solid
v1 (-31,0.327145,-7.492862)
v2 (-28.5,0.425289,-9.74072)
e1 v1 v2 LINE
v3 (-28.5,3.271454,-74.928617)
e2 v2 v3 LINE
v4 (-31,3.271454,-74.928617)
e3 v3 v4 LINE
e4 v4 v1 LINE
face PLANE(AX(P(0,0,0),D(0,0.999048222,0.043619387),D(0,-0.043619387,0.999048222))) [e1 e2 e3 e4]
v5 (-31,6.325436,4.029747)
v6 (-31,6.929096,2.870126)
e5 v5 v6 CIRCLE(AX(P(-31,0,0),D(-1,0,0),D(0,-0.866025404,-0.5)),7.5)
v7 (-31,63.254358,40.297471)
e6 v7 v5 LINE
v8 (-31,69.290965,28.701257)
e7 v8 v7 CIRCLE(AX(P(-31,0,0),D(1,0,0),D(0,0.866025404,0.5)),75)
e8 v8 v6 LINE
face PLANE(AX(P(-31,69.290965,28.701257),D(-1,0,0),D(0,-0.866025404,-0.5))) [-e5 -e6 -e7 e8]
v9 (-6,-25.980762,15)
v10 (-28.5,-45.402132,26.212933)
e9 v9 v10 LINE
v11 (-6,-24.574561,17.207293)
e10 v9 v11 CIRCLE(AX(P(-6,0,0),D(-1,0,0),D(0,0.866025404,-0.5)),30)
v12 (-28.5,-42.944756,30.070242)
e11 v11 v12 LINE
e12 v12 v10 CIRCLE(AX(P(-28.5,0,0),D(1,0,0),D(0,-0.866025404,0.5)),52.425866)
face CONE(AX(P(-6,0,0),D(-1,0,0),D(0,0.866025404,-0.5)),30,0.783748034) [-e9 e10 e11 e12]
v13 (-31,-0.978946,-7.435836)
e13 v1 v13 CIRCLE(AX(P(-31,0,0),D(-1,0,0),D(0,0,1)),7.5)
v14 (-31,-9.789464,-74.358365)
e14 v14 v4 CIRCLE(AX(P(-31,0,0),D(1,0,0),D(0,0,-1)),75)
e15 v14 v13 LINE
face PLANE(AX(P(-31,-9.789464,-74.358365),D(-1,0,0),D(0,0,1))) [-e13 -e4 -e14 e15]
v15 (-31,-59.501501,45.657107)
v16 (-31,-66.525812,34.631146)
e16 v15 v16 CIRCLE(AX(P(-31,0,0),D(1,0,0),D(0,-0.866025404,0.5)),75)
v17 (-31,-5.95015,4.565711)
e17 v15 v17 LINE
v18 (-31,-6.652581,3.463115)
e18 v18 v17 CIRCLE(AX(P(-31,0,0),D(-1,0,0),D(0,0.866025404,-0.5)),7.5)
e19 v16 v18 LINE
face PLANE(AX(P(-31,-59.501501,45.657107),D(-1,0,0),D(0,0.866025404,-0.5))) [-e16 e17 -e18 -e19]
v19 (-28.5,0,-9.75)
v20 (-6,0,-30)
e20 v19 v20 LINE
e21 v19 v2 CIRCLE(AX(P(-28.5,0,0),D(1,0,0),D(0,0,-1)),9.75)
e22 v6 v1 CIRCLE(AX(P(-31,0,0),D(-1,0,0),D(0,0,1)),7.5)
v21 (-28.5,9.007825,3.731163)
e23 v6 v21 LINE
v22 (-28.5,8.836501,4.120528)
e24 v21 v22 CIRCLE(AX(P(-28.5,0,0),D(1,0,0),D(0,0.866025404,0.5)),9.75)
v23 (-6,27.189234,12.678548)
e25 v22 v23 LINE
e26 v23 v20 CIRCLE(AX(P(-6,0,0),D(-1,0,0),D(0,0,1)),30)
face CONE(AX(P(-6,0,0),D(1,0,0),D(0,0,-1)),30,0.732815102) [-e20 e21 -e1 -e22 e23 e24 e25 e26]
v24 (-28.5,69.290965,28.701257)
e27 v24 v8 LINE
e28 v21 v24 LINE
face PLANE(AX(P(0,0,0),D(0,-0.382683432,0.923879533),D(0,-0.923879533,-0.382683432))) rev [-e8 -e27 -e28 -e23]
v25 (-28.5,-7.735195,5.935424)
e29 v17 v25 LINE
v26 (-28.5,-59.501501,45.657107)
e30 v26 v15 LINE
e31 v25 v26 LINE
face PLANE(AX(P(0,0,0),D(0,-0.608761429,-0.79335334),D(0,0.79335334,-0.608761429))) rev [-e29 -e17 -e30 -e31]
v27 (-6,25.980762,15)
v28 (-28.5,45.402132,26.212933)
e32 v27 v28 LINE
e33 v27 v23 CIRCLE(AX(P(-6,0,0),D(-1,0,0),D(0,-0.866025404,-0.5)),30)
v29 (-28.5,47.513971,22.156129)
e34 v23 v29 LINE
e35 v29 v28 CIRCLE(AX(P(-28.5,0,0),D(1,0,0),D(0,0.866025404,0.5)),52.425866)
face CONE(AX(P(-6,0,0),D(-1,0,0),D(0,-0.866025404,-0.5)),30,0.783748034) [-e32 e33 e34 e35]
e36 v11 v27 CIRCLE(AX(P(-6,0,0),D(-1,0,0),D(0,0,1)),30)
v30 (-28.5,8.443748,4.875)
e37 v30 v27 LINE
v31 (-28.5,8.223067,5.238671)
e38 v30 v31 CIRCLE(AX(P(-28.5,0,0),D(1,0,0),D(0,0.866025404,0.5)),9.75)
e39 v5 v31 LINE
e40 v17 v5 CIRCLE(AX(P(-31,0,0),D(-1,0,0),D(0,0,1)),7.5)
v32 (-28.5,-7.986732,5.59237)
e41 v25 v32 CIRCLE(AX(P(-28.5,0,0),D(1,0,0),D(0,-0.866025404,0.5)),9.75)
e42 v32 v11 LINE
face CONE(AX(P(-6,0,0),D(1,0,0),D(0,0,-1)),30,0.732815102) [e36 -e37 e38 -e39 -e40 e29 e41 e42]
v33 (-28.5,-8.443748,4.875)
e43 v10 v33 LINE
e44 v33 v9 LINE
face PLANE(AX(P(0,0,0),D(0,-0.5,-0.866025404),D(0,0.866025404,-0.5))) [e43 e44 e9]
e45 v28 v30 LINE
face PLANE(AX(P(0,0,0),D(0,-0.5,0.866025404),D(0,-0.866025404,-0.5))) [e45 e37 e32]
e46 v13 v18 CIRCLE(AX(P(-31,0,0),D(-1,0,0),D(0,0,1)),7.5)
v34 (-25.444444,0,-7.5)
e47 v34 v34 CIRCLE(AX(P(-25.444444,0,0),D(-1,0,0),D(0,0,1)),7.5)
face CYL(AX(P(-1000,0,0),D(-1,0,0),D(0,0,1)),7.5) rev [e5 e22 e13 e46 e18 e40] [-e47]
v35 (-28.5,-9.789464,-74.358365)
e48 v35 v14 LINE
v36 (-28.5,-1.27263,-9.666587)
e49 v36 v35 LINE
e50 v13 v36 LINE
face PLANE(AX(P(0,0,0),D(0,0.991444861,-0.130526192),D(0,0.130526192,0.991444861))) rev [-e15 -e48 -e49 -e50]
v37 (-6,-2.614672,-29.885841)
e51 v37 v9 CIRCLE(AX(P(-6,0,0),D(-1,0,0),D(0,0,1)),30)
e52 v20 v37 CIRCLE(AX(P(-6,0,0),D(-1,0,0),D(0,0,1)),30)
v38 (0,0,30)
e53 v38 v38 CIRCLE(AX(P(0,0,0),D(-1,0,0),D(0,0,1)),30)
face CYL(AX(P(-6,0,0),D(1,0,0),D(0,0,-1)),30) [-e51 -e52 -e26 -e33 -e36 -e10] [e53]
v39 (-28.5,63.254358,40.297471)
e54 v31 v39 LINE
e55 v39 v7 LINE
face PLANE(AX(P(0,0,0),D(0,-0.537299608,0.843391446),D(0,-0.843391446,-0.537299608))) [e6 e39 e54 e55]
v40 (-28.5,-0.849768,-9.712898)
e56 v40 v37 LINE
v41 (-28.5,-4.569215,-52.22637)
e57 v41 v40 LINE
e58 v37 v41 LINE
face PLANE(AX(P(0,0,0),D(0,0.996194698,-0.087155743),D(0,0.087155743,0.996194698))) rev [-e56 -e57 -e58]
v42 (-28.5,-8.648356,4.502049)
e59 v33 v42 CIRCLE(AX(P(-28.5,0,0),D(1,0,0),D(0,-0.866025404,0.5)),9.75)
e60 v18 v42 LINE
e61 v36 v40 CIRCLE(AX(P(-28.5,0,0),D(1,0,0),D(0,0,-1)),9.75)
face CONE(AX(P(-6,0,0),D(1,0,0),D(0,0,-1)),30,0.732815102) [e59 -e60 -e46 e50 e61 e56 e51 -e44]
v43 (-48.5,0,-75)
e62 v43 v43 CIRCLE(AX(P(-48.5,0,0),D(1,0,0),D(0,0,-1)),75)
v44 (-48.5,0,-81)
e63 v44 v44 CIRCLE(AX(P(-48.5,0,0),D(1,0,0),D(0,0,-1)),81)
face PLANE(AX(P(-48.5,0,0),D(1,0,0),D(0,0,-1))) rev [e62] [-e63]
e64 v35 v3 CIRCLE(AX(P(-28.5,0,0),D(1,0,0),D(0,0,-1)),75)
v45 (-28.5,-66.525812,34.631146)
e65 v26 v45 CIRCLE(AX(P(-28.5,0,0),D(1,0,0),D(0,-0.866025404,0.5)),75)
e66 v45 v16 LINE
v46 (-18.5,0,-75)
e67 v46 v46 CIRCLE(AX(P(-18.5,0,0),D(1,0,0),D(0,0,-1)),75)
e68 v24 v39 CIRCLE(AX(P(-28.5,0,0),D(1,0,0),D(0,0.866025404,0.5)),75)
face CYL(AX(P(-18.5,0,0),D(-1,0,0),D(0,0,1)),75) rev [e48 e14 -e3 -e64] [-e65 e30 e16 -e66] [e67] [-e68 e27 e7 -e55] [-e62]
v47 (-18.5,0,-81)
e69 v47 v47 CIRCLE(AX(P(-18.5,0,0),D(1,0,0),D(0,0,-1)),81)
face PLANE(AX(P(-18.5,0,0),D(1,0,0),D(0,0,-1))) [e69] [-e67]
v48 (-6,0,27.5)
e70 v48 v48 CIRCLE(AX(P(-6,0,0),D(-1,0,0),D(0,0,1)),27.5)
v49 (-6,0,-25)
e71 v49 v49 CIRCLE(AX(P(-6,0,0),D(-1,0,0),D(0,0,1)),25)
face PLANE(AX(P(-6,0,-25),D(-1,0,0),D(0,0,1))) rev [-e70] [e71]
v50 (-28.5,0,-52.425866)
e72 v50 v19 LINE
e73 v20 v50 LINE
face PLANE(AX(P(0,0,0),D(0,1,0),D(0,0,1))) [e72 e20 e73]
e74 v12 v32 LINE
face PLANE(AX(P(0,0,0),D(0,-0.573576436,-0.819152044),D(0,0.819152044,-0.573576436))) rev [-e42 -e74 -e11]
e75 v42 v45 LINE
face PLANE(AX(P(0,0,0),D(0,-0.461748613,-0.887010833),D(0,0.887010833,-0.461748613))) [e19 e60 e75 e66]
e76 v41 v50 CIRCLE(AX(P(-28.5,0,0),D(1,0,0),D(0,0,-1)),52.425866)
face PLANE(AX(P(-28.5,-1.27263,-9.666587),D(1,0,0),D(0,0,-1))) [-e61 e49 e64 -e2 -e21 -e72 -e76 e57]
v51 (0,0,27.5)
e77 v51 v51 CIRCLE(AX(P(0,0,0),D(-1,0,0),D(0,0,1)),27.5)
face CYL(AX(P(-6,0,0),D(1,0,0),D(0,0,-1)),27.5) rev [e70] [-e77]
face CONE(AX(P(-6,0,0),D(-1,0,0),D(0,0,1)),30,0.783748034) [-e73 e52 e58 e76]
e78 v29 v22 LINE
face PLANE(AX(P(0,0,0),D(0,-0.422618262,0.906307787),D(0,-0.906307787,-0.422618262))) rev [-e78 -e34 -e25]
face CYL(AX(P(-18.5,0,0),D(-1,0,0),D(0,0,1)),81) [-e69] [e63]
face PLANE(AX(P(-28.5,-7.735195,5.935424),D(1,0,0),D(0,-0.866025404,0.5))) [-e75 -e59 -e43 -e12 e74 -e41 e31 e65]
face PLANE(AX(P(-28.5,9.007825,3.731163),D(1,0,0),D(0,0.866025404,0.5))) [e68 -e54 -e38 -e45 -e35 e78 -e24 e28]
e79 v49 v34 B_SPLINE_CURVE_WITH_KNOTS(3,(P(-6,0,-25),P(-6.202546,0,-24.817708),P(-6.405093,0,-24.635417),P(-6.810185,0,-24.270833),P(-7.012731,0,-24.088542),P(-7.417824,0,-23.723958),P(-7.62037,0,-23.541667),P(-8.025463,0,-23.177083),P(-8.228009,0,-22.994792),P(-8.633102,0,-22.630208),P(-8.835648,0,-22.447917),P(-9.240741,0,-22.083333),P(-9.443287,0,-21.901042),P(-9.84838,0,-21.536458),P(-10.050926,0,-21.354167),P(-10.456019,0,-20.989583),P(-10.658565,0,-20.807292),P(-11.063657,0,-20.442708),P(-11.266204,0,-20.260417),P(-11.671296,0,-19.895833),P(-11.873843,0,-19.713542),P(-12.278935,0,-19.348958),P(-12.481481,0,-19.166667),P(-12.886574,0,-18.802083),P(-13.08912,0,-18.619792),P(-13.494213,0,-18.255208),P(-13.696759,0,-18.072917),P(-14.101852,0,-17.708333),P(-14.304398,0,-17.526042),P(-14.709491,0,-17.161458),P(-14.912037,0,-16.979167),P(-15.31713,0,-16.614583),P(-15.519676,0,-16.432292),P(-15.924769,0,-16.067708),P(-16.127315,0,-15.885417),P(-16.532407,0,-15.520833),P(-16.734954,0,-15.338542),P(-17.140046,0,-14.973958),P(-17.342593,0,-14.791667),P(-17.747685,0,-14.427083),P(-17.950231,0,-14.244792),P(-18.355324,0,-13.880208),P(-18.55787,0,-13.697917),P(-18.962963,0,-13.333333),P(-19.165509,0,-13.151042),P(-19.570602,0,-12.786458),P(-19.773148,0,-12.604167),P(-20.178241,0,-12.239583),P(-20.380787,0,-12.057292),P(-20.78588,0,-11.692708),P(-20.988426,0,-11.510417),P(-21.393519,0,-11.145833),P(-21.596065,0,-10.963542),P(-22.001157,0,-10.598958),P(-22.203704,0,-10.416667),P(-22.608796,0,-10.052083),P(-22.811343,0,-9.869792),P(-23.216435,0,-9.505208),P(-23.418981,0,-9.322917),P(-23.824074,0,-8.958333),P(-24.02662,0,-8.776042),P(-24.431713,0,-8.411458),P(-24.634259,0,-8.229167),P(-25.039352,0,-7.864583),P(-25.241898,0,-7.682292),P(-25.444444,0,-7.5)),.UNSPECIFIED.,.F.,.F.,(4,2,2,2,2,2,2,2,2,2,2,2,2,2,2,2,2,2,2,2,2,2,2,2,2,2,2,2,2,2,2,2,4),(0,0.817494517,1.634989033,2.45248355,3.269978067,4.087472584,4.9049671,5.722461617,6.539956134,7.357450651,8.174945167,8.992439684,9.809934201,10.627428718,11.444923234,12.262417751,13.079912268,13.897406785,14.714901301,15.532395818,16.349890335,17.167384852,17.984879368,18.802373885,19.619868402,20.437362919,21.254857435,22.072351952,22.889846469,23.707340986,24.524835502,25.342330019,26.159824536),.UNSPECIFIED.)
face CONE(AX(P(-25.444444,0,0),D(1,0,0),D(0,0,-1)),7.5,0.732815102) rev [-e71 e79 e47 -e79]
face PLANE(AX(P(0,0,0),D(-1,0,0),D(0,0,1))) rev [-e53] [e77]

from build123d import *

# Parameters (mm, degrees)
SKETCH_5_R               = 30
SKETCH_5_R_2             = 27.5
EXTRUDE_1_DEPTH          = 6
REVOLVE_1_OUTLINE_W      = 67.5
REVOLVE_1_OUTLINE_H      = 2.5
REVOLVE_1_ANGLE          = 10
REVOLVE_2_ANGLE          = 5
PATTERN_CIRCULAR_1_COUNT = 3
EXTRUDE_2_DEPTH          = 10
EXTRUDE_2_DEPTH_BACK     = 20
SKETCH_14_R              = 81
SKETCH_14_R_2            = 75


# Read off the part's stored shape, not the designer's step: 旋轉1
with BuildPart() as part:
    # 草圖5 → 填料-伸長1 (new body)
    with BuildSketch(Plane.ZY):
        Circle(SKETCH_5_R)
        Circle(SKETCH_5_R_2, mode=Mode.SUBTRACT)
    extrude(amount=EXTRUDE_1_DEPTH)

    # 草圖13 → 旋轉3 (revolve)
    with BuildSketch(Plane(origin=(0, 0, 0), x_dir=(1, 0, 0), z_dir=(0, 1, 0))):
        Polygon((-6, 30), (-31, 7.5), (-25.444444444, 7.5), (-6, 25), align=None)
    revolve(axis=Axis((-1000, 0, 0), (1, 0, 0)))

    # 旋轉1 outline → 旋轉1 (revolve)
    with BuildSketch(Plane(origin=(0, 0, 0), x_dir=(0, -0.13052619222005293, -0.9914448613738103), z_dir=(0, -0.9914448613738103, 0.13052619222005293))):
        with Locations((41.25, -29.75)):
            Rectangle(REVOLVE_1_OUTLINE_W, REVOLVE_1_OUTLINE_H)
    revolve_1 = revolve(axis=Axis((0, 0, 0), (1, 0, 0)), revolution_arc=REVOLVE_1_ANGLE)

    # 草圖12 → 旋轉2 (revolve)
    with BuildSketch(Plane(origin=(0, 0, 0), x_dir=(1, 0, 0), z_dir=(0, 1, 0))):
        Polygon((-31, 54.917629386), (-6, 30), (-31, 7.5), align=None)
    revolve_2 = revolve(axis=Axis((0, 0, 0), (-1, 0, 0)), revolution_arc=REVOLVE_2_ANGLE)

    # 環狀複製排列1: 旋轉1, 旋轉2 ×3 about axis
    pattern_circular_1_axis = Axis((0, 0, 0), (1, 0, 0))
    add([revolve_1.rotate(pattern_circular_1_axis, i * 360 / PATTERN_CIRCULAR_1_COUNT) for i in range(1, PATTERN_CIRCULAR_1_COUNT)])
    add([revolve_2.rotate(pattern_circular_1_axis, i * 360 / PATTERN_CIRCULAR_1_COUNT) for i in range(1, PATTERN_CIRCULAR_1_COUNT)])

    # 草圖14 → 填料-伸長2 (add, two sides: drawn at the far end of the back side and taken through both)
    with BuildSketch(Plane(origin=(-28.5, 0, 0), x_dir=(0, 0, -1), z_dir=(1, 0, 0)).offset(-EXTRUDE_2_DEPTH_BACK)):
        Circle(SKETCH_14_R)
        Circle(SKETCH_14_R_2, mode=Mode.SUBTRACT)
    extrude(amount=EXTRUDE_2_DEPTH + EXTRUDE_2_DEPTH_BACK)


solid = part.part
